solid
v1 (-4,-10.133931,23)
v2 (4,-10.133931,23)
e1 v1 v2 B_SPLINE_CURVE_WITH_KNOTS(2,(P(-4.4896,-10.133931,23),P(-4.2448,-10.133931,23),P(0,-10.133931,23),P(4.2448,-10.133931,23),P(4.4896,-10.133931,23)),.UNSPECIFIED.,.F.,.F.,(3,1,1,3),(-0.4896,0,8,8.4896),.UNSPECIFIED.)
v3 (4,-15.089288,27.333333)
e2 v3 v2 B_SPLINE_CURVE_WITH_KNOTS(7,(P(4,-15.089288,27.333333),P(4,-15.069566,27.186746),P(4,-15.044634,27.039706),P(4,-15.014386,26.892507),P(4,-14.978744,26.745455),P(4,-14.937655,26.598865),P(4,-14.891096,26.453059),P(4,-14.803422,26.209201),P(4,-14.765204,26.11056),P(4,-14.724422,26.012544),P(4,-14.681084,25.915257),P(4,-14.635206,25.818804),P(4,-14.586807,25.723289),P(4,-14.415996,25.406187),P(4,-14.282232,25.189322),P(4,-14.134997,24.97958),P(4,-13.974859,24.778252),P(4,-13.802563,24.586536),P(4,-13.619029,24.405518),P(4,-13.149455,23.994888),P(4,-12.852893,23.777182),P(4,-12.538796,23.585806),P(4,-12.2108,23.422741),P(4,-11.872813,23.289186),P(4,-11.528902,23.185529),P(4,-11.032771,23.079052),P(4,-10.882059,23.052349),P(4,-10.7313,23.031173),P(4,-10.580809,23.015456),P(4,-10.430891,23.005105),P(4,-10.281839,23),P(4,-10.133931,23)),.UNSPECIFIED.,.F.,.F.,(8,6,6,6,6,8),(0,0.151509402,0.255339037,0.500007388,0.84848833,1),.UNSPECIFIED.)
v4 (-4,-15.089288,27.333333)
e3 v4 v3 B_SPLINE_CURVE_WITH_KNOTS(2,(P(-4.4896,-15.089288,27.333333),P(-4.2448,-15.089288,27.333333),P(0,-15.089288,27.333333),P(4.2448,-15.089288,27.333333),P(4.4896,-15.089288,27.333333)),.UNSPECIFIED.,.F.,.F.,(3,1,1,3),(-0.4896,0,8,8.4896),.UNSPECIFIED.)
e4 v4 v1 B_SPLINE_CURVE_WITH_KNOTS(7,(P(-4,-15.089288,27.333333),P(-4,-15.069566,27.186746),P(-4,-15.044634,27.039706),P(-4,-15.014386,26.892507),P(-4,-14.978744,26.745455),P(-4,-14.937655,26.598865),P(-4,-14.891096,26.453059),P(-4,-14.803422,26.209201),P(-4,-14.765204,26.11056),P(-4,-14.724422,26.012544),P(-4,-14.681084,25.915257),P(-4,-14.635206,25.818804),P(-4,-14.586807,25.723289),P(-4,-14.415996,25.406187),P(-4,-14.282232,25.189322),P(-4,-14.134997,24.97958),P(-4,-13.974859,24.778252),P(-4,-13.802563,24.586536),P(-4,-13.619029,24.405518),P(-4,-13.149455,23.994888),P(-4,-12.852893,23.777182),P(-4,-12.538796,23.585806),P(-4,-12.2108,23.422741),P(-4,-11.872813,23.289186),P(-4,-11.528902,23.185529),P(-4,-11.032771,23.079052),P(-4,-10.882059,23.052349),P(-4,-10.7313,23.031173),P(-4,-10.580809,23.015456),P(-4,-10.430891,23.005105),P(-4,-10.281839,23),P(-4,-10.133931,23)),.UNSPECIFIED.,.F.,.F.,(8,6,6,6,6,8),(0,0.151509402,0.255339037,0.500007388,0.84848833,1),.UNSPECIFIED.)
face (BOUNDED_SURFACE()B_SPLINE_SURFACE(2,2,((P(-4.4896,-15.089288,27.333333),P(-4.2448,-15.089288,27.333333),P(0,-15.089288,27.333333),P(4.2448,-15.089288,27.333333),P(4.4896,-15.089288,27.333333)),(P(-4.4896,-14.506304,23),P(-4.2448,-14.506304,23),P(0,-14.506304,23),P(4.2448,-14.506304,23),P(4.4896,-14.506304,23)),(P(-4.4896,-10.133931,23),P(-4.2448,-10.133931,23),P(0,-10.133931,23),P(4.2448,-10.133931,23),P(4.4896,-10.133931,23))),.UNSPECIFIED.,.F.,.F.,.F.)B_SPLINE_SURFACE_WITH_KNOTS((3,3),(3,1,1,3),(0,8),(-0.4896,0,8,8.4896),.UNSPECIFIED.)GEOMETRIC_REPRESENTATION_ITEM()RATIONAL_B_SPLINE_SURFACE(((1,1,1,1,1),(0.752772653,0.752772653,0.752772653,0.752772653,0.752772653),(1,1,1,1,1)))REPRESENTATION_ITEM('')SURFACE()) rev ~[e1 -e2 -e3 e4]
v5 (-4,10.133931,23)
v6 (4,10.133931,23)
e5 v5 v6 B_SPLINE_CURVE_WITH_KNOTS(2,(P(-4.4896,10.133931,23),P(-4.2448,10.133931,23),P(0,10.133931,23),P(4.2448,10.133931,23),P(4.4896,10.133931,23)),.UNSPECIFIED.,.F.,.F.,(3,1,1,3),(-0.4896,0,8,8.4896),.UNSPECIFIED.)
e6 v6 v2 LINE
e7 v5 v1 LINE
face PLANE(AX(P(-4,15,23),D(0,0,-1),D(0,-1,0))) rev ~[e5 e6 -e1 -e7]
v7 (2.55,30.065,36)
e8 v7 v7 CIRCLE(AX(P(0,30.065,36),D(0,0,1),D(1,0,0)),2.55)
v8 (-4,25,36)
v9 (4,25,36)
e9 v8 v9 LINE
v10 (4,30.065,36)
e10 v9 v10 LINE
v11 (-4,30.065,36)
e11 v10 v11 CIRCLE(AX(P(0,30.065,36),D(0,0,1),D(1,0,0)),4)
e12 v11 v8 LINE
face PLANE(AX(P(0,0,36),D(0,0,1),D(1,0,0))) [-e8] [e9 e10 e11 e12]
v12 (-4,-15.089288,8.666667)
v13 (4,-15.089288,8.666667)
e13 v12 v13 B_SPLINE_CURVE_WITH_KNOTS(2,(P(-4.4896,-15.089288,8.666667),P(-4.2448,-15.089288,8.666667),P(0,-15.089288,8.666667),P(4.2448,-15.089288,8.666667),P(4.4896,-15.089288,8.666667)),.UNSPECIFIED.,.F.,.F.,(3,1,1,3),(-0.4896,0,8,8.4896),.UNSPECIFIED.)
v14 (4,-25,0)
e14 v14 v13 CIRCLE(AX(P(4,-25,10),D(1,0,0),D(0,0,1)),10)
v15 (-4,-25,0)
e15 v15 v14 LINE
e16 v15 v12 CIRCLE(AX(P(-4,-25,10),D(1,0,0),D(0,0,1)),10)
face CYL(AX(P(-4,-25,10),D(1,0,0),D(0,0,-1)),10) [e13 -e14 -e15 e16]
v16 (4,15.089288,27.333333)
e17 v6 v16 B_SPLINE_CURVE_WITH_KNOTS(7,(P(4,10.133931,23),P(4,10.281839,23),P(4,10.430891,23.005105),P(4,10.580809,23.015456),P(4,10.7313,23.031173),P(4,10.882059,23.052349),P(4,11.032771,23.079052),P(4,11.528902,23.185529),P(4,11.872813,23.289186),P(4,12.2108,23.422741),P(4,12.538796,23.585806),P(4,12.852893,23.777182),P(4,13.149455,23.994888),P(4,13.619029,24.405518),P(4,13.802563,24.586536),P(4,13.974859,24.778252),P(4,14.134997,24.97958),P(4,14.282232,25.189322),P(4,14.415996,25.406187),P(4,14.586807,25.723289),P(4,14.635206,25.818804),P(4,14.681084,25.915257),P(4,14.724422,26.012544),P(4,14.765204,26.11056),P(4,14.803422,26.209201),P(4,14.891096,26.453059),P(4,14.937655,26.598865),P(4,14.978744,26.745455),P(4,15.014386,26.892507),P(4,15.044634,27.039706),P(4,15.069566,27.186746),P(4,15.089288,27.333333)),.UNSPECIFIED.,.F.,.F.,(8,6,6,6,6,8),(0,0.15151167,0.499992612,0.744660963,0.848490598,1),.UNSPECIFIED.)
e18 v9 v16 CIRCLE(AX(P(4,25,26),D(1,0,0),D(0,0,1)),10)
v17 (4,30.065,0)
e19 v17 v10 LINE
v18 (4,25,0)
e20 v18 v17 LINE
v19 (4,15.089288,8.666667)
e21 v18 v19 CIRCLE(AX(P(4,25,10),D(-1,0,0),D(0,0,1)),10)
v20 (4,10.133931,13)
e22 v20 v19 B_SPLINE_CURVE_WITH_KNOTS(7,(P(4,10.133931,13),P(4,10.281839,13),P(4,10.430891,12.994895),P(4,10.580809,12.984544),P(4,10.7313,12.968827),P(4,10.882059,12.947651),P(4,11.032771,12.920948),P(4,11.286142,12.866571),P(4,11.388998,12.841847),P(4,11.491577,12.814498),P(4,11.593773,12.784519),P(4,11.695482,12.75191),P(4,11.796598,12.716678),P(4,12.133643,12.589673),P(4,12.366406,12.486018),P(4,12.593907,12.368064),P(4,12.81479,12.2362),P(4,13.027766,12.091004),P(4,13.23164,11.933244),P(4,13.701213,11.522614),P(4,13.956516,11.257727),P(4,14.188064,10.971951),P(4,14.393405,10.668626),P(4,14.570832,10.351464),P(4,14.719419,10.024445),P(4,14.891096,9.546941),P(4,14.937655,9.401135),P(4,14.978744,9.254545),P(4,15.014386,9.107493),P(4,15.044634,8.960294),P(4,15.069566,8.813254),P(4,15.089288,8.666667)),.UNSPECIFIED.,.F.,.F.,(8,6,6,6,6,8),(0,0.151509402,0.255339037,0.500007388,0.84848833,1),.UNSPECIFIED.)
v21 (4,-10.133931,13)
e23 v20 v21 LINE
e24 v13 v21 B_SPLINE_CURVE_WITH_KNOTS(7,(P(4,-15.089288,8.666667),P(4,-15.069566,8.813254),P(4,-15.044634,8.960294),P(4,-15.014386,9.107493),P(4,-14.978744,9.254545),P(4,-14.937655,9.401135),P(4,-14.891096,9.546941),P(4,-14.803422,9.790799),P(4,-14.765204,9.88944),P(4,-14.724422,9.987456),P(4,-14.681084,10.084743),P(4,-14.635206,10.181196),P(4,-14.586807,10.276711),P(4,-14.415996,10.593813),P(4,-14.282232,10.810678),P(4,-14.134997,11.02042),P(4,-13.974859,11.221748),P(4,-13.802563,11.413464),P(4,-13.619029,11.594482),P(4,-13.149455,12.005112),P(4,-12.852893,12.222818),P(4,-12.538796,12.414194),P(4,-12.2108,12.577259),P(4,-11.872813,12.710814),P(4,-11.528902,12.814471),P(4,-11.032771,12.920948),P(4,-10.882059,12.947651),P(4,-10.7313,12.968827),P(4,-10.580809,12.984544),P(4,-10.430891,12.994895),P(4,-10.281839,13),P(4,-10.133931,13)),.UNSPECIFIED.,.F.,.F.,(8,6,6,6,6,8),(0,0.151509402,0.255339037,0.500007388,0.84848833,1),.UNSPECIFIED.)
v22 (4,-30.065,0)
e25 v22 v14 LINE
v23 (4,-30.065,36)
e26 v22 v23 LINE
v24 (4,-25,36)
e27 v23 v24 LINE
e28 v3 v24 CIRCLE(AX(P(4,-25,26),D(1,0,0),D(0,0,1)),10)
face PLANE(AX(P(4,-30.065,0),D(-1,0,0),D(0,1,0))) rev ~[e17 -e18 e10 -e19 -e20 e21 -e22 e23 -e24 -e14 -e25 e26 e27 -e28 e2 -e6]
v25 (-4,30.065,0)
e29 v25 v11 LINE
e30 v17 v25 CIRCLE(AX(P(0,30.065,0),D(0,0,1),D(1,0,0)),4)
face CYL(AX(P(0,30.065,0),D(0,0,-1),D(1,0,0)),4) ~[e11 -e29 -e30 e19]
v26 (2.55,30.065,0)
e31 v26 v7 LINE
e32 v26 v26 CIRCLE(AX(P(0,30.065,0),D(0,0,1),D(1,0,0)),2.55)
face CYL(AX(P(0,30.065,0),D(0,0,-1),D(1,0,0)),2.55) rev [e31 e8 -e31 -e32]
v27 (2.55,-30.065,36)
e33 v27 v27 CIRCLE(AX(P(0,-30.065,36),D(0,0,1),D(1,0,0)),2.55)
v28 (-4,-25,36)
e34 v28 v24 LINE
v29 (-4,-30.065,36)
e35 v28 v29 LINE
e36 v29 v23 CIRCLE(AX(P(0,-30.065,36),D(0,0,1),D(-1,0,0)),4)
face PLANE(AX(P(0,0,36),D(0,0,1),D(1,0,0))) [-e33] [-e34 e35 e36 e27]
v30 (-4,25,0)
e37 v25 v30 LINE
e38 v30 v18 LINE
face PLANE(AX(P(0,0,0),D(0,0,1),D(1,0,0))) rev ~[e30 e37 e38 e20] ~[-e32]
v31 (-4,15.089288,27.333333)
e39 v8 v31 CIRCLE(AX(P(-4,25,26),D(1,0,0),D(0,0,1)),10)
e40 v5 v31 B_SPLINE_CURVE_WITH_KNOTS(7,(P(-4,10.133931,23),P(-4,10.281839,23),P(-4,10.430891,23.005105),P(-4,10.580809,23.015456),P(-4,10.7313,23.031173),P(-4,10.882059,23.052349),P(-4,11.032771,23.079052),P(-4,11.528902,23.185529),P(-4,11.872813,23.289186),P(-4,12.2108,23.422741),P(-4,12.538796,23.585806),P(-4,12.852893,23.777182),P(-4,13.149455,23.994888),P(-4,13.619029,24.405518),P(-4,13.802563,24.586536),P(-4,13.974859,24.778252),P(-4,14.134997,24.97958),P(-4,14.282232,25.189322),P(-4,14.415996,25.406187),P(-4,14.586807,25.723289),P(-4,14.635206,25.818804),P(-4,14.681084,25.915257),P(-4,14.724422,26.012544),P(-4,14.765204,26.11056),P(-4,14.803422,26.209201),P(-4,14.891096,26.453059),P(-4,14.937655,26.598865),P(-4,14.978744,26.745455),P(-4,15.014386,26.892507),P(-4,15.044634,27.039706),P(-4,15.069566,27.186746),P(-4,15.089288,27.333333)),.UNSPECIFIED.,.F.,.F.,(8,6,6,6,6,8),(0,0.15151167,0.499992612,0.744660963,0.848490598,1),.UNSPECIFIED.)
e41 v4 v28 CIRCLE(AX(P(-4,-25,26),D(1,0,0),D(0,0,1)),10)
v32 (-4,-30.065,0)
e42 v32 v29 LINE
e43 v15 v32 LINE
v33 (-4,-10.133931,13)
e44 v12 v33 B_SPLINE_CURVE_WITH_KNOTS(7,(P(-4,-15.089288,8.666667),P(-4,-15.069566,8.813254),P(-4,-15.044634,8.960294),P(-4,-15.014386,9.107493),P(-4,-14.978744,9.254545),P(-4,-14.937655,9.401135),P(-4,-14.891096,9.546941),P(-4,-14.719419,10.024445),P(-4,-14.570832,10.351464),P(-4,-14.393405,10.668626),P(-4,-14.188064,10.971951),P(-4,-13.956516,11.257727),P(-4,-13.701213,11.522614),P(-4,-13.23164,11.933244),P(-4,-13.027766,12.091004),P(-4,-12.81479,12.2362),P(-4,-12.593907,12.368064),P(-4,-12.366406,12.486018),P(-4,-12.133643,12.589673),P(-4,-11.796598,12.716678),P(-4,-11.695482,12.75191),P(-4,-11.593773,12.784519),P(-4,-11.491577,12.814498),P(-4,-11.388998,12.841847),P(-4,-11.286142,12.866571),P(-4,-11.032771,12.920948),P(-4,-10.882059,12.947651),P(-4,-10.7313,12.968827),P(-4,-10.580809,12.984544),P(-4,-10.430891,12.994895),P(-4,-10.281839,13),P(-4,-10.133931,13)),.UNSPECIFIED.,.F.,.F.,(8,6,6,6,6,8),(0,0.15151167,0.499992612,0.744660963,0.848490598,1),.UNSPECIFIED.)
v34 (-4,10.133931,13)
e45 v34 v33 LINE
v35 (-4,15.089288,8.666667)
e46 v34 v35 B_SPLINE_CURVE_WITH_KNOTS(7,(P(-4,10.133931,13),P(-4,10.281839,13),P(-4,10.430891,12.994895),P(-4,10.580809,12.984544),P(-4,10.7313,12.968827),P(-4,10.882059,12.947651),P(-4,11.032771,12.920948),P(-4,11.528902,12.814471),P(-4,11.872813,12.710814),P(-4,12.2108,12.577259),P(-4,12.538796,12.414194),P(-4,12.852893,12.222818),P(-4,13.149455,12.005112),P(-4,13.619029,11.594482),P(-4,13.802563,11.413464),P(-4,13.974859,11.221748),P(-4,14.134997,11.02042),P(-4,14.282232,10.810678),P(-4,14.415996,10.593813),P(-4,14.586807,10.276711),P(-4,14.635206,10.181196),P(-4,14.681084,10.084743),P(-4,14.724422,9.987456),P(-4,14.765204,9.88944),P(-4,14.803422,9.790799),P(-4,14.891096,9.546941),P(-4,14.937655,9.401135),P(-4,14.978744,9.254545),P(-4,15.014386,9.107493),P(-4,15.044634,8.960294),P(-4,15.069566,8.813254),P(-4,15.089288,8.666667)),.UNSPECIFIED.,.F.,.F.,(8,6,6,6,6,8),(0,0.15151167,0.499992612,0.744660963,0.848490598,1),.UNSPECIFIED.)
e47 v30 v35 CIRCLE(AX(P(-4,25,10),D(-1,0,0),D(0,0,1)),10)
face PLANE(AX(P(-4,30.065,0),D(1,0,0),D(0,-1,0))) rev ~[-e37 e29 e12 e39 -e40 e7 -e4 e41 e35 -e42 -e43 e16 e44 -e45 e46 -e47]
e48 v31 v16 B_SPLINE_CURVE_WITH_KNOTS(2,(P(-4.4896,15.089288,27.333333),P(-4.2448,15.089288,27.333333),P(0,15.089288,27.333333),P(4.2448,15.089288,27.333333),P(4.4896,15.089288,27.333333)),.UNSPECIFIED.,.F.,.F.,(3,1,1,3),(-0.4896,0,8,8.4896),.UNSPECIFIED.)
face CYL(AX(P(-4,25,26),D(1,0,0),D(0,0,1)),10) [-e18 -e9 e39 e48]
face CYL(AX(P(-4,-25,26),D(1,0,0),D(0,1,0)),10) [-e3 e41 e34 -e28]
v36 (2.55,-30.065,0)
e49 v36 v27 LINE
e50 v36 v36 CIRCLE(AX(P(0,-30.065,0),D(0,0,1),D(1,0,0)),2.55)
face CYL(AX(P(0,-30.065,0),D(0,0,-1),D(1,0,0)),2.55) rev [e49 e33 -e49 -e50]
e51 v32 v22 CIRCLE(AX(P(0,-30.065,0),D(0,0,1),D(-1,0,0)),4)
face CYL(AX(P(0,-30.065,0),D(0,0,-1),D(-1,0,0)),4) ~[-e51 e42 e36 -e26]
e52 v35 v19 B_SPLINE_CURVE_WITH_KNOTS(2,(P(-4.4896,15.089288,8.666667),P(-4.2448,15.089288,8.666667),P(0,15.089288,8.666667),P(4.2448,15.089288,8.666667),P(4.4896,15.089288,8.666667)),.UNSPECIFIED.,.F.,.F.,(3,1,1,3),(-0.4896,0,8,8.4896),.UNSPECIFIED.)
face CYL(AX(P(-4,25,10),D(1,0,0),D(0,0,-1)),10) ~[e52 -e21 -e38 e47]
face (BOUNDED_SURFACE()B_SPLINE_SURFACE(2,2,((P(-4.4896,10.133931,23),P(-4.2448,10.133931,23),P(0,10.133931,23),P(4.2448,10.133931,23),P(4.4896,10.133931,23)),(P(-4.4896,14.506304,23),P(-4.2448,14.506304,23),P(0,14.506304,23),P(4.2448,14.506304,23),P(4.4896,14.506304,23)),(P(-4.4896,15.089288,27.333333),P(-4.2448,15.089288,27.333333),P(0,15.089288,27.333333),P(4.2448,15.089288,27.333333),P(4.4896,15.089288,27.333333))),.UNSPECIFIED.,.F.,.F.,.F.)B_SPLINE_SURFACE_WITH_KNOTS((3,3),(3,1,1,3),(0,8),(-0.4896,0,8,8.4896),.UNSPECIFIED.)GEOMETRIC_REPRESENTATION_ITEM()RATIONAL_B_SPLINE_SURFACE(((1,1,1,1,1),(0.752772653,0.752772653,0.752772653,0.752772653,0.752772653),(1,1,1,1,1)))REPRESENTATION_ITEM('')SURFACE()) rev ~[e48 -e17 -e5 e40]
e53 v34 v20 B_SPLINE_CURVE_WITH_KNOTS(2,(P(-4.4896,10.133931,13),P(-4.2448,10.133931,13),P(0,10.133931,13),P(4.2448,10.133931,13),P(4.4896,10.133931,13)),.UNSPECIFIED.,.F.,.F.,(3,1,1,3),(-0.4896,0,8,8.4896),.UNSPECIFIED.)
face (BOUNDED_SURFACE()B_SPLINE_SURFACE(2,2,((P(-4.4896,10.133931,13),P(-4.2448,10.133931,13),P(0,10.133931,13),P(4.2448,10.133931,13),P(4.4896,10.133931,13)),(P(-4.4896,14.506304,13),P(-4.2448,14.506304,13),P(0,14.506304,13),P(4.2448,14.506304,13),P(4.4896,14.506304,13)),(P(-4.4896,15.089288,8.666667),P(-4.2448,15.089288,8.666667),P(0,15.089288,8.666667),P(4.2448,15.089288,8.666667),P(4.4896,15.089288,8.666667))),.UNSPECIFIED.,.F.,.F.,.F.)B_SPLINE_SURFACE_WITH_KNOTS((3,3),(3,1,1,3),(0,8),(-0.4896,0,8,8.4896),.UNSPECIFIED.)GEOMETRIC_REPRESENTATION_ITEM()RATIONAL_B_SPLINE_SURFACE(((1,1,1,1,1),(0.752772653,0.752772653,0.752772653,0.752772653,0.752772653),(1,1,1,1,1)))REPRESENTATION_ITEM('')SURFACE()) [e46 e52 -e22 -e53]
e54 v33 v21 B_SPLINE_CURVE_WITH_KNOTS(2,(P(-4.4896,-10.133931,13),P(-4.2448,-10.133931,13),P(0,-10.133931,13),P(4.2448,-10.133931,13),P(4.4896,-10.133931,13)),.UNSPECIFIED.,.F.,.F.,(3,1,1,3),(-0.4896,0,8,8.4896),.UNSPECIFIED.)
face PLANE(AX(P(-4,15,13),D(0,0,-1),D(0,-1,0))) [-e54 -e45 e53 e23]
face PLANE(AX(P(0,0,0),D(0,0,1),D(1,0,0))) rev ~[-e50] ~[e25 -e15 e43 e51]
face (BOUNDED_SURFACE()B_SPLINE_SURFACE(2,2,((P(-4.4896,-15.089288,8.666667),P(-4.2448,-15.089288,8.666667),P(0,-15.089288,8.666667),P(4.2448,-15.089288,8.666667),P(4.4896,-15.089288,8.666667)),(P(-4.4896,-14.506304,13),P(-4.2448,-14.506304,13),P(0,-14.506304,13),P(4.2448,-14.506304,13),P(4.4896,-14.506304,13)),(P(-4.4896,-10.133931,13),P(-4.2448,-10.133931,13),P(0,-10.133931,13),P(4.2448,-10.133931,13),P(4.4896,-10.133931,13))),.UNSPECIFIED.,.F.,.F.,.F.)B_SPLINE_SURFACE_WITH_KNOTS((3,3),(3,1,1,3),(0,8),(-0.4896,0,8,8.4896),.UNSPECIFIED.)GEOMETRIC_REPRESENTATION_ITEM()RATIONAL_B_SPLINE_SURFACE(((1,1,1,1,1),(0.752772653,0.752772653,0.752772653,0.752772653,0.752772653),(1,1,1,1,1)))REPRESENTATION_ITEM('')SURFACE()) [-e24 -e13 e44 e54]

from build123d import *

# Parameters (mm, degrees)
F0_R     = 2.55
F1_DEPTH = 36
F2_W     = 30
F2_H     = 13
F3_DEPTH = 8
F4_R     = 10
F5_R     = 5


with BuildPart() as f1:
    # F0 (on Top) → F1 (new body)
    with BuildSketch(Plane.XY):
        with BuildLine():
            ThreePointArc((4, 30.065), (0, 34.065), (-4, 30.065))
            Line((-4, 30.065), (-4, -30.065))
            ThreePointArc((-4, -30.065), (0, -34.065), (4, -30.065))
            Line((4, -30.065), (4, 30.065))
        make_face()
        with Locations((0, -30.065)):
            Circle(F0_R, mode=Mode.SUBTRACT)
        with Locations((0, 30.065)):
            Circle(F0_R, mode=Mode.SUBTRACT)
    extrude(amount=F1_DEPTH)

    # F2 (on face) → F3 (cut, through all)
    with BuildSketch(Plane(origin=(-4, 0, 0), x_dir=(0, -1, 0), z_dir=(-1, 0, 0))):
        with Locations((0, 29.5)):
            Rectangle(F2_W, F2_H)
        with Locations((0, 6.5)):
            Rectangle(F2_W, F2_H)
    extrude(amount=-F3_DEPTH, mode=Mode.SUBTRACT)

    # F4
    f4_edges = [f1.edges().sort_by_distance(p)[0] for p in [
        (0, 15, 36),
        (0, 15, 0),
        (0, -15, 0),
        (0, -15, 36),
    ]]
    fillet(f4_edges, radius=F4_R)

    # F5
    f5_edges = [f1.edges().sort_by_distance(p)[0] for p in [
        (0, 15, 23),
        (0, -15, 23),
        (0, -15, 13),
        (0, 15, 13),
    ]]
    fillet(f5_edges, radius=F5_R)


solid = f1.part
